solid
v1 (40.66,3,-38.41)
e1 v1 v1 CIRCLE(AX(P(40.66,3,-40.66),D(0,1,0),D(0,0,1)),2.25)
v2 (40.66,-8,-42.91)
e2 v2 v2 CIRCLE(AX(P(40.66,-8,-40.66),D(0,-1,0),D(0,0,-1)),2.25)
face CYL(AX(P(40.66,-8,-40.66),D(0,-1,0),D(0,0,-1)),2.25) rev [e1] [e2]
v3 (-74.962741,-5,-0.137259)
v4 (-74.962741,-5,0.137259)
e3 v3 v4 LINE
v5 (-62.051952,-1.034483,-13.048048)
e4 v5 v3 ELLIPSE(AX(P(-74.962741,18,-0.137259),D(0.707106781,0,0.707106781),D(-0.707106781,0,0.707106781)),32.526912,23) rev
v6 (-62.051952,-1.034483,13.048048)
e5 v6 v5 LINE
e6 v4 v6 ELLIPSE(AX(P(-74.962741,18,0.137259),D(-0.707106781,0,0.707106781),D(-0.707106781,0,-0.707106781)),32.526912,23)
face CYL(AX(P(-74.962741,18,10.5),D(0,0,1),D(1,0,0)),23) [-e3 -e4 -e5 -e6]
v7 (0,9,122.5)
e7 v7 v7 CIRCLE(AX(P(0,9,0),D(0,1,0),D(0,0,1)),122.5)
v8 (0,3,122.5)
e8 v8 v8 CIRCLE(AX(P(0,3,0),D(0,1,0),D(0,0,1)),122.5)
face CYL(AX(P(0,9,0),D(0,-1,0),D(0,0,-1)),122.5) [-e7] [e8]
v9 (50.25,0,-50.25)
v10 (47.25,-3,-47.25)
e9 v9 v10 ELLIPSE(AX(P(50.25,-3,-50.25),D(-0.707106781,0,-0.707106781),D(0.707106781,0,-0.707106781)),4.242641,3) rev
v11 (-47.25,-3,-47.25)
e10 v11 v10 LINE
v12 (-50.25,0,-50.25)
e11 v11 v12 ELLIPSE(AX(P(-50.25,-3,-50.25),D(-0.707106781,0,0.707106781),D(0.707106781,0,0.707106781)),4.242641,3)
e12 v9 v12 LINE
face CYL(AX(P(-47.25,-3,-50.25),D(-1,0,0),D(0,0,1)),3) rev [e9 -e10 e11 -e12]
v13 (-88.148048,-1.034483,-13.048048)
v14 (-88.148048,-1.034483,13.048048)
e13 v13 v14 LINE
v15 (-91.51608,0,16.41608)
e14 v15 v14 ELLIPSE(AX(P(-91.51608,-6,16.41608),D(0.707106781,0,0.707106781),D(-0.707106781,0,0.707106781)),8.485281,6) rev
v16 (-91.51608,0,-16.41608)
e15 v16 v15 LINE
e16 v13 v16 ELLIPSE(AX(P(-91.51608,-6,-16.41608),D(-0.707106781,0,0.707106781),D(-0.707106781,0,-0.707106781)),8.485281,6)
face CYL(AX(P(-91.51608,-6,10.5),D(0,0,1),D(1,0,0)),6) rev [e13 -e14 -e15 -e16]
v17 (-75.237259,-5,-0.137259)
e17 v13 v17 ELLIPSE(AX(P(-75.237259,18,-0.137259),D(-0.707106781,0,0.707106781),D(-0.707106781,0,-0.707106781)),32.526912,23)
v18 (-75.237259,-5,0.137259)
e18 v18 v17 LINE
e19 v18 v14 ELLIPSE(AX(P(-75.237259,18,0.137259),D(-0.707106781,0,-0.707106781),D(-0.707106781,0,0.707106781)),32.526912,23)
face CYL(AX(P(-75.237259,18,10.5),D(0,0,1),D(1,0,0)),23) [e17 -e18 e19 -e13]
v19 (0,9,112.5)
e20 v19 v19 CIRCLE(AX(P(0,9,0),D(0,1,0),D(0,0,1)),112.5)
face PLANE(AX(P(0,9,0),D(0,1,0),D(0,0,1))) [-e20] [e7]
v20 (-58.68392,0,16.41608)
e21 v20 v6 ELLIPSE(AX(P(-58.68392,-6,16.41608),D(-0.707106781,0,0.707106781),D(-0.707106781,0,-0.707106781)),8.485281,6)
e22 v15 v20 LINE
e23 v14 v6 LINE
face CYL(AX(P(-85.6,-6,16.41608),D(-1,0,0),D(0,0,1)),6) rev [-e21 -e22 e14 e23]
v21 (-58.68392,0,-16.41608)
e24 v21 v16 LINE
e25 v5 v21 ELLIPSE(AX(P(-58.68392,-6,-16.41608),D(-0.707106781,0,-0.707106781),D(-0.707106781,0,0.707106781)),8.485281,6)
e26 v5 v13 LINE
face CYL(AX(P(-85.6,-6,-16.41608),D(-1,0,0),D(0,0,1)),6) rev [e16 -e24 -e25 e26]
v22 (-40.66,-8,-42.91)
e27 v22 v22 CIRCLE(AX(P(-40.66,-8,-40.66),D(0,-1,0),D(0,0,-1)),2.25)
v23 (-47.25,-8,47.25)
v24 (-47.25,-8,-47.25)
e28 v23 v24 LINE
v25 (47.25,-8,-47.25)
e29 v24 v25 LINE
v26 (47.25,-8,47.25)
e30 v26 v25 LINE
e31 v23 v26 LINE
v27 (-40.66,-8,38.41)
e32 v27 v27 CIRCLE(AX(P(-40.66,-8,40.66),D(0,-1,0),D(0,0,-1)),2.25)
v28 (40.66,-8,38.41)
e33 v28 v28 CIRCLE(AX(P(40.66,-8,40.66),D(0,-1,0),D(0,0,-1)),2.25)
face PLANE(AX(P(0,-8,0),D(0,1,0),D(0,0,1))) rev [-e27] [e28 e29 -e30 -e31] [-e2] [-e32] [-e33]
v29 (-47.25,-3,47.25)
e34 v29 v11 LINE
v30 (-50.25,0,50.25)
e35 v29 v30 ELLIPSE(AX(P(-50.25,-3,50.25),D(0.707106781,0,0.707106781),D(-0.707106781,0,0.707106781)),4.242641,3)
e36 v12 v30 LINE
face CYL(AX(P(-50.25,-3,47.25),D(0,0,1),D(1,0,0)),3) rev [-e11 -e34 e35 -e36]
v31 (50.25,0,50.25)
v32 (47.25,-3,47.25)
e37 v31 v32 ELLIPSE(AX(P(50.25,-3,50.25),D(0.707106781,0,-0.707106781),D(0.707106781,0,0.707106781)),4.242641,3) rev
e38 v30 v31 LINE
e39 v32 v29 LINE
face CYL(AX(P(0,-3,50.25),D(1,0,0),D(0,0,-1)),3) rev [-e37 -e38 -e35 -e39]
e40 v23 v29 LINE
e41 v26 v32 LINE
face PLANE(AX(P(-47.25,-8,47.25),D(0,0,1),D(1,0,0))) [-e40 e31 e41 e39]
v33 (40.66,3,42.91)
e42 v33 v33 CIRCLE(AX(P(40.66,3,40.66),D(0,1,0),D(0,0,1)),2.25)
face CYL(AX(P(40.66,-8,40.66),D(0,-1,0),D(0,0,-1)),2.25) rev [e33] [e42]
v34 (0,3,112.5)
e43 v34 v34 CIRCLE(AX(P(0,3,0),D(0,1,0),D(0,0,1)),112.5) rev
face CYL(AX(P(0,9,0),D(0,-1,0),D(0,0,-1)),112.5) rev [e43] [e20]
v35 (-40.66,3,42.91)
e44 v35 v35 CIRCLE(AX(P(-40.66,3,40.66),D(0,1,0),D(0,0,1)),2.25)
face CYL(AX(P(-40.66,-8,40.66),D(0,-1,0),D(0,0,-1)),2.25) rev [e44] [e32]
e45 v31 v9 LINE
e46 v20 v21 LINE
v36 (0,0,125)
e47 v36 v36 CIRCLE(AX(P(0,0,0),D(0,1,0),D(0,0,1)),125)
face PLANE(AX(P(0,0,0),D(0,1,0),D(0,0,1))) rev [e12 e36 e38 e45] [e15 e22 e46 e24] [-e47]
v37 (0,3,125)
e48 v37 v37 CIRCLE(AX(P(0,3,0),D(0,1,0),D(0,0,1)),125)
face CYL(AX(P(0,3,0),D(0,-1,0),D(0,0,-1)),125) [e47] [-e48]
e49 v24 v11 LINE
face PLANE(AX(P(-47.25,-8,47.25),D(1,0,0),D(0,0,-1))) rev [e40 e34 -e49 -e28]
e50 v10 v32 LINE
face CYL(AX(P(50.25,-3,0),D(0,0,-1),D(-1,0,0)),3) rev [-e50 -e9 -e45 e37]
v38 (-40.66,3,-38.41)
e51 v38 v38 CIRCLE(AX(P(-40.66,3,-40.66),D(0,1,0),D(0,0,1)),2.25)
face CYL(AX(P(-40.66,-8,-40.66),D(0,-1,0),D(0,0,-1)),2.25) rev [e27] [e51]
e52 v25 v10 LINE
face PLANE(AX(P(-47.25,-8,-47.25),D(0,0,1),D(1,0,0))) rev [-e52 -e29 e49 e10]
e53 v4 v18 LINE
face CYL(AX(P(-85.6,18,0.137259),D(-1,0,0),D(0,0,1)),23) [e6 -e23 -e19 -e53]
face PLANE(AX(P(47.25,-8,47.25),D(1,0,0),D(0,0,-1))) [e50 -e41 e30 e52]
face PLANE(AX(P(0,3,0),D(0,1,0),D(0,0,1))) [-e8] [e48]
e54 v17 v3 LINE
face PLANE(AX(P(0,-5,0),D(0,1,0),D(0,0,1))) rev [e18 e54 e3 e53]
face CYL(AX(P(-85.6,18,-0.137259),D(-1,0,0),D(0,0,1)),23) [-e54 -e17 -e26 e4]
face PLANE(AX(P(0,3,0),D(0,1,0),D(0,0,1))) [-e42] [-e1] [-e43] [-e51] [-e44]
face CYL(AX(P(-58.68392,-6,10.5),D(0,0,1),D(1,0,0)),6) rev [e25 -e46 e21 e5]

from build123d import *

# Parameters (mm, degrees)
SKETCH1_R            = 125
BOSS_EXTRUDE1_DEPTH  = 3
SKETCH2_R            = 122.5
SKETCH2_R_2          = 112.5
BOSS_EXTRUDE2_DEPTH  = 6
SKETCH3_W            = 94.5
SKETCH3_H            = 94.5
BOSS_EXTRUDE3_DEPTH  = 8
M4_CLEARANCE_HOLE1_D = 4.5
FILLET1_R            = 3
SKETCH8_W            = 21
SKETCH8_H            = 21
BOSS_EXTRUDE4_DEPTH  = 5
FILLET2_R            = 6
FILLET3_R            = 23


with BuildPart() as part:
    # Sketch1 → Boss-Extrude1 (new body)
    with BuildSketch(Plane(origin=(0, 0, 0), x_dir=(1, 0, 0), z_dir=(0, 1, 0))):
        with Locations(Location((0, 0, 0), (0, 0, 270))):
            Circle(SKETCH1_R)
    extrude(amount=BOSS_EXTRUDE1_DEPTH)

    # Sketch2 → Boss-Extrude2 (add)
    with BuildSketch(Plane(origin=(0, 3, 0), x_dir=(1, 0, 0), z_dir=(0, 1, 0))):
        with Locations(Location((0, 0, 0), (0, 0, 270))):
            Circle(SKETCH2_R)
        with Locations(Location((0, 0, 0), (0, 0, 270))):
            Circle(SKETCH2_R_2, mode=Mode.SUBTRACT)
    extrude(amount=BOSS_EXTRUDE2_DEPTH)

    # Sketch3 → Boss-Extrude3 (add)
    with BuildSketch(Plane.XZ):
        Rectangle(SKETCH3_W, SKETCH3_H)
    extrude(amount=BOSS_EXTRUDE3_DEPTH)

    # M4 Clearance Hole1 (through all)
    with Locations(Plane(origin=(0, -8, 0), x_dir=(-1, 0, 0), z_dir=(0, -1, 0))):
        with Locations((40.66, 40.66), (40.66, -40.66), (-40.66, -40.66), (-40.66, 40.66)):
            Hole(M4_CLEARANCE_HOLE1_D / 2)

    # Fillet1
    fillet1_edges = [part.edges().sort_by_distance(p)[0] for p in [
        (0, 0, -47.25),
        (-47.25, 0, 0),
        (0, 0, 47.25),
        (47.25, 0, 0),
    ]]
    fillet(fillet1_edges, radius=FILLET1_R)

    # Sketch8 → Boss-Extrude4 (add)
    with BuildSketch(Plane(origin=(0, 0, 0), x_dir=(-1, 0, 0), z_dir=(0, -1, 0))):
        with Locations((75.1, 0)):
            Rectangle(SKETCH8_W, SKETCH8_H)
    extrude(amount=BOSS_EXTRUDE4_DEPTH)

    # Fillet2
    # the kernel refuses this fillet: 6 mm, written as the material it adds along each edge
    with BuildSketch(Plane(origin=(-64.6, 0, 10.5), x_dir=(1, 0, 0), z_dir=(0, 0, -1)), Plane(origin=(-85.6, 0, 10.5), x_dir=(0, 0, 1), z_dir=(1, 0, 0)), Plane(origin=(-85.6, 0, -10.5), x_dir=(-1, 0, 0), z_dir=(0, 0, 1)), Plane(origin=(-64.6, 0, -10.5), x_dir=(0, 0, -1), z_dir=(-1, 0, 0))) as fillet2_piece_1:
        with BuildLine():
            CenterArc((5.916079783, 6), FILLET2_R, 189.594068227, 80.405931773)
            Line((0, 5), (-0.118321596, 4.98))
            ThreePointArc((-0.118321596, 4.98), (-0.12, 2.5), (-0.12, 0))
            Line((-0.12, 0), (0, -0.12))
            Line((0, -0.12), (5.916079783, -0.12))
            Line((5.916079783, -0.12), (5.916079783, 0))
        make_face()
    extrude(amount=21)
    with BuildSketch(Plane(origin=(-85.6, 0, 10.5), x_dir=(0, 0, 1), z_dir=(1, 0, 0))) as fillet2_piece_2a_section:
        with BuildLine():
            CenterArc((5.916079783, 6), FILLET2_R, 189.594068227, 80.405931773)
            Line((0, 5), (-0.118321596, 4.98))
            ThreePointArc((-0.118321596, 4.98), (-0.12, 2.5), (-0.12, 0))
            Line((-0.12, 0), (0, -0.12))
            Line((0, -0.12), (5.916079783, -0.12))
            Line((5.916079783, -0.12), (5.916079783, 0))
        make_face()
    fillet2_piece_2a = extrude(amount=35.790199458, mode=Mode.PRIVATE)
    fillet2_piece_2a = split(fillet2_piece_2a, bisect_by=Plane(origin=(-64.6, -1.233917871, 11.87196406), z_dir=(1, 0, 0)), keep=Keep.TOP, mode=Mode.PRIVATE)
    with BuildSketch(Plane(origin=(-64.6, 0, 25.290199458), x_dir=(1, 0, 0), z_dir=(0, 0, -1))) as fillet2_piece_2b_section:
        with BuildLine():
            CenterArc((5.916079783, 6), FILLET2_R, 189.594068227, 80.405931773)
            Line((0, 5), (-0.118321596, 4.98))
            ThreePointArc((-0.118321596, 4.98), (-0.12, 2.5), (-0.12, 0))
            Line((-0.12, 0), (0, -0.12))
            Line((0, -0.12), (5.916079783, -0.12))
            Line((5.916079783, -0.12), (5.916079783, 0))
        make_face()
    fillet2_piece_2b = extrude(amount=35.790199458, mode=Mode.PRIVATE)
    fillet2_piece_2b = split(fillet2_piece_2b, bisect_by=Plane(origin=(-63.22803594, -1.233917871, 10.5), z_dir=(0, 0, 1)), keep=Keep.TOP, mode=Mode.PRIVATE)
    fillet2_piece_2 = fillet2_piece_2a & fillet2_piece_2b
    add(fillet2_piece_2)
    with BuildSketch(Plane(origin=(-64.6, 0, 10.5), x_dir=(1, 0, 0), z_dir=(0, 0, -1))) as fillet2_piece_3a_section:
        with BuildLine():
            CenterArc((5.916079783, 6), FILLET2_R, 189.594068227, 80.405931773)
            Line((0, 5), (-0.118321596, 4.98))
            ThreePointArc((-0.118321596, 4.98), (-0.12, 2.5), (-0.12, 0))
            Line((-0.12, 0), (0, -0.12))
            Line((0, -0.12), (5.916079783, -0.12))
            Line((5.916079783, -0.12), (5.916079783, 0))
        make_face()
    fillet2_piece_3a = extrude(amount=35.790199458, mode=Mode.PRIVATE)
    fillet2_piece_3a = split(fillet2_piece_3a, bisect_by=Plane(origin=(-63.22803594, -1.233917871, -10.5), z_dir=(0, 0, -1)), keep=Keep.TOP, mode=Mode.PRIVATE)
    with BuildSketch(Plane(origin=(-49.809800542, 0, -10.5), x_dir=(0, 0, -1), z_dir=(-1, 0, 0))) as fillet2_piece_3b_section:
        with BuildLine():
            CenterArc((5.916079783, 6), FILLET2_R, 189.594068227, 80.405931773)
            Line((0, 5), (-0.118321596, 4.98))
            ThreePointArc((-0.118321596, 4.98), (-0.12, 2.5), (-0.12, 0))
            Line((-0.12, 0), (0, -0.12))
            Line((0, -0.12), (5.916079783, -0.12))
            Line((5.916079783, -0.12), (5.916079783, 0))
        make_face()
    fillet2_piece_3b = extrude(amount=35.790199458, mode=Mode.PRIVATE)
    fillet2_piece_3b = split(fillet2_piece_3b, bisect_by=Plane(origin=(-64.6, -1.233917871, -11.87196406), z_dir=(1, 0, 0)), keep=Keep.TOP, mode=Mode.PRIVATE)
    fillet2_piece_3 = fillet2_piece_3a & fillet2_piece_3b
    add(fillet2_piece_3)
    with BuildSketch(Plane(origin=(-100.390199458, 0, 10.5), x_dir=(0, 0, 1), z_dir=(1, 0, 0))) as fillet2_piece_4a_section:
        with BuildLine():
            CenterArc((5.916079783, 6), FILLET2_R, 189.594068227, 80.405931773)
            Line((0, 5), (-0.118321596, 4.98))
            ThreePointArc((-0.118321596, 4.98), (-0.12, 2.5), (-0.12, 0))
            Line((-0.12, 0), (0, -0.12))
            Line((0, -0.12), (5.916079783, -0.12))
            Line((5.916079783, -0.12), (5.916079783, 0))
        make_face()
    fillet2_piece_4a = extrude(amount=35.790199458, mode=Mode.PRIVATE)
    fillet2_piece_4a = split(fillet2_piece_4a, bisect_by=Plane(origin=(-85.6, -1.233917871, 11.87196406), z_dir=(-1, 0, 0)), keep=Keep.TOP, mode=Mode.PRIVATE)
    with BuildSketch(Plane(origin=(-85.6, 0, -10.5), x_dir=(-1, 0, 0), z_dir=(0, 0, 1))) as fillet2_piece_4b_section:
        with BuildLine():
            CenterArc((5.916079783, 6), FILLET2_R, 189.594068227, 80.405931773)
            Line((0, 5), (-0.118321596, 4.98))
            ThreePointArc((-0.118321596, 4.98), (-0.12, 2.5), (-0.12, 0))
            Line((-0.12, 0), (0, -0.12))
            Line((0, -0.12), (5.916079783, -0.12))
            Line((5.916079783, -0.12), (5.916079783, 0))
        make_face()
    fillet2_piece_4b = extrude(amount=35.790199458, mode=Mode.PRIVATE)
    fillet2_piece_4b = split(fillet2_piece_4b, bisect_by=Plane(origin=(-86.97196406, -1.233917871, 10.5), z_dir=(0, 0, 1)), keep=Keep.TOP, mode=Mode.PRIVATE)
    fillet2_piece_4 = fillet2_piece_4a & fillet2_piece_4b
    add(fillet2_piece_4)
    with BuildSketch(Plane(origin=(-64.6, 0, -10.5), x_dir=(0, 0, -1), z_dir=(-1, 0, 0))) as fillet2_piece_5a_section:
        with BuildLine():
            CenterArc((5.916079783, 6), FILLET2_R, 189.594068227, 80.405931773)
            Line((0, 5), (-0.118321596, 4.98))
            ThreePointArc((-0.118321596, 4.98), (-0.12, 2.5), (-0.12, 0))
            Line((-0.12, 0), (0, -0.12))
            Line((0, -0.12), (5.916079783, -0.12))
            Line((5.916079783, -0.12), (5.916079783, 0))
        make_face()
    fillet2_piece_5a = extrude(amount=35.790199458, mode=Mode.PRIVATE)
    fillet2_piece_5a = split(fillet2_piece_5a, bisect_by=Plane(origin=(-85.6, -1.233917871, -11.87196406), z_dir=(-1, 0, 0)), keep=Keep.TOP, mode=Mode.PRIVATE)
    with BuildSketch(Plane(origin=(-85.6, 0, -25.290199458), x_dir=(-1, 0, 0), z_dir=(0, 0, 1))) as fillet2_piece_5b_section:
        with BuildLine():
            CenterArc((5.916079783, 6), FILLET2_R, 189.594068227, 80.405931773)
            Line((0, 5), (-0.118321596, 4.98))
            ThreePointArc((-0.118321596, 4.98), (-0.12, 2.5), (-0.12, 0))
            Line((-0.12, 0), (0, -0.12))
            Line((0, -0.12), (5.916079783, -0.12))
            Line((5.916079783, -0.12), (5.916079783, 0))
        make_face()
    fillet2_piece_5b = extrude(amount=35.790199458, mode=Mode.PRIVATE)
    fillet2_piece_5b = split(fillet2_piece_5b, bisect_by=Plane(origin=(-86.97196406, -1.233917871, -10.5), z_dir=(0, 0, -1)), keep=Keep.TOP, mode=Mode.PRIVATE)
    fillet2_piece_5 = fillet2_piece_5a & fillet2_piece_5b
    add(fillet2_piece_5)

    # Fillet3
    fillet3_edges = [part.edges().sort_by_distance(p)[0] for p in [
        (-85.6, -5, 0),
        (-75.1, -5, -10.5),
        (-64.6, -5, 0),
        (-75.1, -5, 10.5),
    ]]
    fillet(fillet3_edges, radius=FILLET3_R)


solid = part.part
